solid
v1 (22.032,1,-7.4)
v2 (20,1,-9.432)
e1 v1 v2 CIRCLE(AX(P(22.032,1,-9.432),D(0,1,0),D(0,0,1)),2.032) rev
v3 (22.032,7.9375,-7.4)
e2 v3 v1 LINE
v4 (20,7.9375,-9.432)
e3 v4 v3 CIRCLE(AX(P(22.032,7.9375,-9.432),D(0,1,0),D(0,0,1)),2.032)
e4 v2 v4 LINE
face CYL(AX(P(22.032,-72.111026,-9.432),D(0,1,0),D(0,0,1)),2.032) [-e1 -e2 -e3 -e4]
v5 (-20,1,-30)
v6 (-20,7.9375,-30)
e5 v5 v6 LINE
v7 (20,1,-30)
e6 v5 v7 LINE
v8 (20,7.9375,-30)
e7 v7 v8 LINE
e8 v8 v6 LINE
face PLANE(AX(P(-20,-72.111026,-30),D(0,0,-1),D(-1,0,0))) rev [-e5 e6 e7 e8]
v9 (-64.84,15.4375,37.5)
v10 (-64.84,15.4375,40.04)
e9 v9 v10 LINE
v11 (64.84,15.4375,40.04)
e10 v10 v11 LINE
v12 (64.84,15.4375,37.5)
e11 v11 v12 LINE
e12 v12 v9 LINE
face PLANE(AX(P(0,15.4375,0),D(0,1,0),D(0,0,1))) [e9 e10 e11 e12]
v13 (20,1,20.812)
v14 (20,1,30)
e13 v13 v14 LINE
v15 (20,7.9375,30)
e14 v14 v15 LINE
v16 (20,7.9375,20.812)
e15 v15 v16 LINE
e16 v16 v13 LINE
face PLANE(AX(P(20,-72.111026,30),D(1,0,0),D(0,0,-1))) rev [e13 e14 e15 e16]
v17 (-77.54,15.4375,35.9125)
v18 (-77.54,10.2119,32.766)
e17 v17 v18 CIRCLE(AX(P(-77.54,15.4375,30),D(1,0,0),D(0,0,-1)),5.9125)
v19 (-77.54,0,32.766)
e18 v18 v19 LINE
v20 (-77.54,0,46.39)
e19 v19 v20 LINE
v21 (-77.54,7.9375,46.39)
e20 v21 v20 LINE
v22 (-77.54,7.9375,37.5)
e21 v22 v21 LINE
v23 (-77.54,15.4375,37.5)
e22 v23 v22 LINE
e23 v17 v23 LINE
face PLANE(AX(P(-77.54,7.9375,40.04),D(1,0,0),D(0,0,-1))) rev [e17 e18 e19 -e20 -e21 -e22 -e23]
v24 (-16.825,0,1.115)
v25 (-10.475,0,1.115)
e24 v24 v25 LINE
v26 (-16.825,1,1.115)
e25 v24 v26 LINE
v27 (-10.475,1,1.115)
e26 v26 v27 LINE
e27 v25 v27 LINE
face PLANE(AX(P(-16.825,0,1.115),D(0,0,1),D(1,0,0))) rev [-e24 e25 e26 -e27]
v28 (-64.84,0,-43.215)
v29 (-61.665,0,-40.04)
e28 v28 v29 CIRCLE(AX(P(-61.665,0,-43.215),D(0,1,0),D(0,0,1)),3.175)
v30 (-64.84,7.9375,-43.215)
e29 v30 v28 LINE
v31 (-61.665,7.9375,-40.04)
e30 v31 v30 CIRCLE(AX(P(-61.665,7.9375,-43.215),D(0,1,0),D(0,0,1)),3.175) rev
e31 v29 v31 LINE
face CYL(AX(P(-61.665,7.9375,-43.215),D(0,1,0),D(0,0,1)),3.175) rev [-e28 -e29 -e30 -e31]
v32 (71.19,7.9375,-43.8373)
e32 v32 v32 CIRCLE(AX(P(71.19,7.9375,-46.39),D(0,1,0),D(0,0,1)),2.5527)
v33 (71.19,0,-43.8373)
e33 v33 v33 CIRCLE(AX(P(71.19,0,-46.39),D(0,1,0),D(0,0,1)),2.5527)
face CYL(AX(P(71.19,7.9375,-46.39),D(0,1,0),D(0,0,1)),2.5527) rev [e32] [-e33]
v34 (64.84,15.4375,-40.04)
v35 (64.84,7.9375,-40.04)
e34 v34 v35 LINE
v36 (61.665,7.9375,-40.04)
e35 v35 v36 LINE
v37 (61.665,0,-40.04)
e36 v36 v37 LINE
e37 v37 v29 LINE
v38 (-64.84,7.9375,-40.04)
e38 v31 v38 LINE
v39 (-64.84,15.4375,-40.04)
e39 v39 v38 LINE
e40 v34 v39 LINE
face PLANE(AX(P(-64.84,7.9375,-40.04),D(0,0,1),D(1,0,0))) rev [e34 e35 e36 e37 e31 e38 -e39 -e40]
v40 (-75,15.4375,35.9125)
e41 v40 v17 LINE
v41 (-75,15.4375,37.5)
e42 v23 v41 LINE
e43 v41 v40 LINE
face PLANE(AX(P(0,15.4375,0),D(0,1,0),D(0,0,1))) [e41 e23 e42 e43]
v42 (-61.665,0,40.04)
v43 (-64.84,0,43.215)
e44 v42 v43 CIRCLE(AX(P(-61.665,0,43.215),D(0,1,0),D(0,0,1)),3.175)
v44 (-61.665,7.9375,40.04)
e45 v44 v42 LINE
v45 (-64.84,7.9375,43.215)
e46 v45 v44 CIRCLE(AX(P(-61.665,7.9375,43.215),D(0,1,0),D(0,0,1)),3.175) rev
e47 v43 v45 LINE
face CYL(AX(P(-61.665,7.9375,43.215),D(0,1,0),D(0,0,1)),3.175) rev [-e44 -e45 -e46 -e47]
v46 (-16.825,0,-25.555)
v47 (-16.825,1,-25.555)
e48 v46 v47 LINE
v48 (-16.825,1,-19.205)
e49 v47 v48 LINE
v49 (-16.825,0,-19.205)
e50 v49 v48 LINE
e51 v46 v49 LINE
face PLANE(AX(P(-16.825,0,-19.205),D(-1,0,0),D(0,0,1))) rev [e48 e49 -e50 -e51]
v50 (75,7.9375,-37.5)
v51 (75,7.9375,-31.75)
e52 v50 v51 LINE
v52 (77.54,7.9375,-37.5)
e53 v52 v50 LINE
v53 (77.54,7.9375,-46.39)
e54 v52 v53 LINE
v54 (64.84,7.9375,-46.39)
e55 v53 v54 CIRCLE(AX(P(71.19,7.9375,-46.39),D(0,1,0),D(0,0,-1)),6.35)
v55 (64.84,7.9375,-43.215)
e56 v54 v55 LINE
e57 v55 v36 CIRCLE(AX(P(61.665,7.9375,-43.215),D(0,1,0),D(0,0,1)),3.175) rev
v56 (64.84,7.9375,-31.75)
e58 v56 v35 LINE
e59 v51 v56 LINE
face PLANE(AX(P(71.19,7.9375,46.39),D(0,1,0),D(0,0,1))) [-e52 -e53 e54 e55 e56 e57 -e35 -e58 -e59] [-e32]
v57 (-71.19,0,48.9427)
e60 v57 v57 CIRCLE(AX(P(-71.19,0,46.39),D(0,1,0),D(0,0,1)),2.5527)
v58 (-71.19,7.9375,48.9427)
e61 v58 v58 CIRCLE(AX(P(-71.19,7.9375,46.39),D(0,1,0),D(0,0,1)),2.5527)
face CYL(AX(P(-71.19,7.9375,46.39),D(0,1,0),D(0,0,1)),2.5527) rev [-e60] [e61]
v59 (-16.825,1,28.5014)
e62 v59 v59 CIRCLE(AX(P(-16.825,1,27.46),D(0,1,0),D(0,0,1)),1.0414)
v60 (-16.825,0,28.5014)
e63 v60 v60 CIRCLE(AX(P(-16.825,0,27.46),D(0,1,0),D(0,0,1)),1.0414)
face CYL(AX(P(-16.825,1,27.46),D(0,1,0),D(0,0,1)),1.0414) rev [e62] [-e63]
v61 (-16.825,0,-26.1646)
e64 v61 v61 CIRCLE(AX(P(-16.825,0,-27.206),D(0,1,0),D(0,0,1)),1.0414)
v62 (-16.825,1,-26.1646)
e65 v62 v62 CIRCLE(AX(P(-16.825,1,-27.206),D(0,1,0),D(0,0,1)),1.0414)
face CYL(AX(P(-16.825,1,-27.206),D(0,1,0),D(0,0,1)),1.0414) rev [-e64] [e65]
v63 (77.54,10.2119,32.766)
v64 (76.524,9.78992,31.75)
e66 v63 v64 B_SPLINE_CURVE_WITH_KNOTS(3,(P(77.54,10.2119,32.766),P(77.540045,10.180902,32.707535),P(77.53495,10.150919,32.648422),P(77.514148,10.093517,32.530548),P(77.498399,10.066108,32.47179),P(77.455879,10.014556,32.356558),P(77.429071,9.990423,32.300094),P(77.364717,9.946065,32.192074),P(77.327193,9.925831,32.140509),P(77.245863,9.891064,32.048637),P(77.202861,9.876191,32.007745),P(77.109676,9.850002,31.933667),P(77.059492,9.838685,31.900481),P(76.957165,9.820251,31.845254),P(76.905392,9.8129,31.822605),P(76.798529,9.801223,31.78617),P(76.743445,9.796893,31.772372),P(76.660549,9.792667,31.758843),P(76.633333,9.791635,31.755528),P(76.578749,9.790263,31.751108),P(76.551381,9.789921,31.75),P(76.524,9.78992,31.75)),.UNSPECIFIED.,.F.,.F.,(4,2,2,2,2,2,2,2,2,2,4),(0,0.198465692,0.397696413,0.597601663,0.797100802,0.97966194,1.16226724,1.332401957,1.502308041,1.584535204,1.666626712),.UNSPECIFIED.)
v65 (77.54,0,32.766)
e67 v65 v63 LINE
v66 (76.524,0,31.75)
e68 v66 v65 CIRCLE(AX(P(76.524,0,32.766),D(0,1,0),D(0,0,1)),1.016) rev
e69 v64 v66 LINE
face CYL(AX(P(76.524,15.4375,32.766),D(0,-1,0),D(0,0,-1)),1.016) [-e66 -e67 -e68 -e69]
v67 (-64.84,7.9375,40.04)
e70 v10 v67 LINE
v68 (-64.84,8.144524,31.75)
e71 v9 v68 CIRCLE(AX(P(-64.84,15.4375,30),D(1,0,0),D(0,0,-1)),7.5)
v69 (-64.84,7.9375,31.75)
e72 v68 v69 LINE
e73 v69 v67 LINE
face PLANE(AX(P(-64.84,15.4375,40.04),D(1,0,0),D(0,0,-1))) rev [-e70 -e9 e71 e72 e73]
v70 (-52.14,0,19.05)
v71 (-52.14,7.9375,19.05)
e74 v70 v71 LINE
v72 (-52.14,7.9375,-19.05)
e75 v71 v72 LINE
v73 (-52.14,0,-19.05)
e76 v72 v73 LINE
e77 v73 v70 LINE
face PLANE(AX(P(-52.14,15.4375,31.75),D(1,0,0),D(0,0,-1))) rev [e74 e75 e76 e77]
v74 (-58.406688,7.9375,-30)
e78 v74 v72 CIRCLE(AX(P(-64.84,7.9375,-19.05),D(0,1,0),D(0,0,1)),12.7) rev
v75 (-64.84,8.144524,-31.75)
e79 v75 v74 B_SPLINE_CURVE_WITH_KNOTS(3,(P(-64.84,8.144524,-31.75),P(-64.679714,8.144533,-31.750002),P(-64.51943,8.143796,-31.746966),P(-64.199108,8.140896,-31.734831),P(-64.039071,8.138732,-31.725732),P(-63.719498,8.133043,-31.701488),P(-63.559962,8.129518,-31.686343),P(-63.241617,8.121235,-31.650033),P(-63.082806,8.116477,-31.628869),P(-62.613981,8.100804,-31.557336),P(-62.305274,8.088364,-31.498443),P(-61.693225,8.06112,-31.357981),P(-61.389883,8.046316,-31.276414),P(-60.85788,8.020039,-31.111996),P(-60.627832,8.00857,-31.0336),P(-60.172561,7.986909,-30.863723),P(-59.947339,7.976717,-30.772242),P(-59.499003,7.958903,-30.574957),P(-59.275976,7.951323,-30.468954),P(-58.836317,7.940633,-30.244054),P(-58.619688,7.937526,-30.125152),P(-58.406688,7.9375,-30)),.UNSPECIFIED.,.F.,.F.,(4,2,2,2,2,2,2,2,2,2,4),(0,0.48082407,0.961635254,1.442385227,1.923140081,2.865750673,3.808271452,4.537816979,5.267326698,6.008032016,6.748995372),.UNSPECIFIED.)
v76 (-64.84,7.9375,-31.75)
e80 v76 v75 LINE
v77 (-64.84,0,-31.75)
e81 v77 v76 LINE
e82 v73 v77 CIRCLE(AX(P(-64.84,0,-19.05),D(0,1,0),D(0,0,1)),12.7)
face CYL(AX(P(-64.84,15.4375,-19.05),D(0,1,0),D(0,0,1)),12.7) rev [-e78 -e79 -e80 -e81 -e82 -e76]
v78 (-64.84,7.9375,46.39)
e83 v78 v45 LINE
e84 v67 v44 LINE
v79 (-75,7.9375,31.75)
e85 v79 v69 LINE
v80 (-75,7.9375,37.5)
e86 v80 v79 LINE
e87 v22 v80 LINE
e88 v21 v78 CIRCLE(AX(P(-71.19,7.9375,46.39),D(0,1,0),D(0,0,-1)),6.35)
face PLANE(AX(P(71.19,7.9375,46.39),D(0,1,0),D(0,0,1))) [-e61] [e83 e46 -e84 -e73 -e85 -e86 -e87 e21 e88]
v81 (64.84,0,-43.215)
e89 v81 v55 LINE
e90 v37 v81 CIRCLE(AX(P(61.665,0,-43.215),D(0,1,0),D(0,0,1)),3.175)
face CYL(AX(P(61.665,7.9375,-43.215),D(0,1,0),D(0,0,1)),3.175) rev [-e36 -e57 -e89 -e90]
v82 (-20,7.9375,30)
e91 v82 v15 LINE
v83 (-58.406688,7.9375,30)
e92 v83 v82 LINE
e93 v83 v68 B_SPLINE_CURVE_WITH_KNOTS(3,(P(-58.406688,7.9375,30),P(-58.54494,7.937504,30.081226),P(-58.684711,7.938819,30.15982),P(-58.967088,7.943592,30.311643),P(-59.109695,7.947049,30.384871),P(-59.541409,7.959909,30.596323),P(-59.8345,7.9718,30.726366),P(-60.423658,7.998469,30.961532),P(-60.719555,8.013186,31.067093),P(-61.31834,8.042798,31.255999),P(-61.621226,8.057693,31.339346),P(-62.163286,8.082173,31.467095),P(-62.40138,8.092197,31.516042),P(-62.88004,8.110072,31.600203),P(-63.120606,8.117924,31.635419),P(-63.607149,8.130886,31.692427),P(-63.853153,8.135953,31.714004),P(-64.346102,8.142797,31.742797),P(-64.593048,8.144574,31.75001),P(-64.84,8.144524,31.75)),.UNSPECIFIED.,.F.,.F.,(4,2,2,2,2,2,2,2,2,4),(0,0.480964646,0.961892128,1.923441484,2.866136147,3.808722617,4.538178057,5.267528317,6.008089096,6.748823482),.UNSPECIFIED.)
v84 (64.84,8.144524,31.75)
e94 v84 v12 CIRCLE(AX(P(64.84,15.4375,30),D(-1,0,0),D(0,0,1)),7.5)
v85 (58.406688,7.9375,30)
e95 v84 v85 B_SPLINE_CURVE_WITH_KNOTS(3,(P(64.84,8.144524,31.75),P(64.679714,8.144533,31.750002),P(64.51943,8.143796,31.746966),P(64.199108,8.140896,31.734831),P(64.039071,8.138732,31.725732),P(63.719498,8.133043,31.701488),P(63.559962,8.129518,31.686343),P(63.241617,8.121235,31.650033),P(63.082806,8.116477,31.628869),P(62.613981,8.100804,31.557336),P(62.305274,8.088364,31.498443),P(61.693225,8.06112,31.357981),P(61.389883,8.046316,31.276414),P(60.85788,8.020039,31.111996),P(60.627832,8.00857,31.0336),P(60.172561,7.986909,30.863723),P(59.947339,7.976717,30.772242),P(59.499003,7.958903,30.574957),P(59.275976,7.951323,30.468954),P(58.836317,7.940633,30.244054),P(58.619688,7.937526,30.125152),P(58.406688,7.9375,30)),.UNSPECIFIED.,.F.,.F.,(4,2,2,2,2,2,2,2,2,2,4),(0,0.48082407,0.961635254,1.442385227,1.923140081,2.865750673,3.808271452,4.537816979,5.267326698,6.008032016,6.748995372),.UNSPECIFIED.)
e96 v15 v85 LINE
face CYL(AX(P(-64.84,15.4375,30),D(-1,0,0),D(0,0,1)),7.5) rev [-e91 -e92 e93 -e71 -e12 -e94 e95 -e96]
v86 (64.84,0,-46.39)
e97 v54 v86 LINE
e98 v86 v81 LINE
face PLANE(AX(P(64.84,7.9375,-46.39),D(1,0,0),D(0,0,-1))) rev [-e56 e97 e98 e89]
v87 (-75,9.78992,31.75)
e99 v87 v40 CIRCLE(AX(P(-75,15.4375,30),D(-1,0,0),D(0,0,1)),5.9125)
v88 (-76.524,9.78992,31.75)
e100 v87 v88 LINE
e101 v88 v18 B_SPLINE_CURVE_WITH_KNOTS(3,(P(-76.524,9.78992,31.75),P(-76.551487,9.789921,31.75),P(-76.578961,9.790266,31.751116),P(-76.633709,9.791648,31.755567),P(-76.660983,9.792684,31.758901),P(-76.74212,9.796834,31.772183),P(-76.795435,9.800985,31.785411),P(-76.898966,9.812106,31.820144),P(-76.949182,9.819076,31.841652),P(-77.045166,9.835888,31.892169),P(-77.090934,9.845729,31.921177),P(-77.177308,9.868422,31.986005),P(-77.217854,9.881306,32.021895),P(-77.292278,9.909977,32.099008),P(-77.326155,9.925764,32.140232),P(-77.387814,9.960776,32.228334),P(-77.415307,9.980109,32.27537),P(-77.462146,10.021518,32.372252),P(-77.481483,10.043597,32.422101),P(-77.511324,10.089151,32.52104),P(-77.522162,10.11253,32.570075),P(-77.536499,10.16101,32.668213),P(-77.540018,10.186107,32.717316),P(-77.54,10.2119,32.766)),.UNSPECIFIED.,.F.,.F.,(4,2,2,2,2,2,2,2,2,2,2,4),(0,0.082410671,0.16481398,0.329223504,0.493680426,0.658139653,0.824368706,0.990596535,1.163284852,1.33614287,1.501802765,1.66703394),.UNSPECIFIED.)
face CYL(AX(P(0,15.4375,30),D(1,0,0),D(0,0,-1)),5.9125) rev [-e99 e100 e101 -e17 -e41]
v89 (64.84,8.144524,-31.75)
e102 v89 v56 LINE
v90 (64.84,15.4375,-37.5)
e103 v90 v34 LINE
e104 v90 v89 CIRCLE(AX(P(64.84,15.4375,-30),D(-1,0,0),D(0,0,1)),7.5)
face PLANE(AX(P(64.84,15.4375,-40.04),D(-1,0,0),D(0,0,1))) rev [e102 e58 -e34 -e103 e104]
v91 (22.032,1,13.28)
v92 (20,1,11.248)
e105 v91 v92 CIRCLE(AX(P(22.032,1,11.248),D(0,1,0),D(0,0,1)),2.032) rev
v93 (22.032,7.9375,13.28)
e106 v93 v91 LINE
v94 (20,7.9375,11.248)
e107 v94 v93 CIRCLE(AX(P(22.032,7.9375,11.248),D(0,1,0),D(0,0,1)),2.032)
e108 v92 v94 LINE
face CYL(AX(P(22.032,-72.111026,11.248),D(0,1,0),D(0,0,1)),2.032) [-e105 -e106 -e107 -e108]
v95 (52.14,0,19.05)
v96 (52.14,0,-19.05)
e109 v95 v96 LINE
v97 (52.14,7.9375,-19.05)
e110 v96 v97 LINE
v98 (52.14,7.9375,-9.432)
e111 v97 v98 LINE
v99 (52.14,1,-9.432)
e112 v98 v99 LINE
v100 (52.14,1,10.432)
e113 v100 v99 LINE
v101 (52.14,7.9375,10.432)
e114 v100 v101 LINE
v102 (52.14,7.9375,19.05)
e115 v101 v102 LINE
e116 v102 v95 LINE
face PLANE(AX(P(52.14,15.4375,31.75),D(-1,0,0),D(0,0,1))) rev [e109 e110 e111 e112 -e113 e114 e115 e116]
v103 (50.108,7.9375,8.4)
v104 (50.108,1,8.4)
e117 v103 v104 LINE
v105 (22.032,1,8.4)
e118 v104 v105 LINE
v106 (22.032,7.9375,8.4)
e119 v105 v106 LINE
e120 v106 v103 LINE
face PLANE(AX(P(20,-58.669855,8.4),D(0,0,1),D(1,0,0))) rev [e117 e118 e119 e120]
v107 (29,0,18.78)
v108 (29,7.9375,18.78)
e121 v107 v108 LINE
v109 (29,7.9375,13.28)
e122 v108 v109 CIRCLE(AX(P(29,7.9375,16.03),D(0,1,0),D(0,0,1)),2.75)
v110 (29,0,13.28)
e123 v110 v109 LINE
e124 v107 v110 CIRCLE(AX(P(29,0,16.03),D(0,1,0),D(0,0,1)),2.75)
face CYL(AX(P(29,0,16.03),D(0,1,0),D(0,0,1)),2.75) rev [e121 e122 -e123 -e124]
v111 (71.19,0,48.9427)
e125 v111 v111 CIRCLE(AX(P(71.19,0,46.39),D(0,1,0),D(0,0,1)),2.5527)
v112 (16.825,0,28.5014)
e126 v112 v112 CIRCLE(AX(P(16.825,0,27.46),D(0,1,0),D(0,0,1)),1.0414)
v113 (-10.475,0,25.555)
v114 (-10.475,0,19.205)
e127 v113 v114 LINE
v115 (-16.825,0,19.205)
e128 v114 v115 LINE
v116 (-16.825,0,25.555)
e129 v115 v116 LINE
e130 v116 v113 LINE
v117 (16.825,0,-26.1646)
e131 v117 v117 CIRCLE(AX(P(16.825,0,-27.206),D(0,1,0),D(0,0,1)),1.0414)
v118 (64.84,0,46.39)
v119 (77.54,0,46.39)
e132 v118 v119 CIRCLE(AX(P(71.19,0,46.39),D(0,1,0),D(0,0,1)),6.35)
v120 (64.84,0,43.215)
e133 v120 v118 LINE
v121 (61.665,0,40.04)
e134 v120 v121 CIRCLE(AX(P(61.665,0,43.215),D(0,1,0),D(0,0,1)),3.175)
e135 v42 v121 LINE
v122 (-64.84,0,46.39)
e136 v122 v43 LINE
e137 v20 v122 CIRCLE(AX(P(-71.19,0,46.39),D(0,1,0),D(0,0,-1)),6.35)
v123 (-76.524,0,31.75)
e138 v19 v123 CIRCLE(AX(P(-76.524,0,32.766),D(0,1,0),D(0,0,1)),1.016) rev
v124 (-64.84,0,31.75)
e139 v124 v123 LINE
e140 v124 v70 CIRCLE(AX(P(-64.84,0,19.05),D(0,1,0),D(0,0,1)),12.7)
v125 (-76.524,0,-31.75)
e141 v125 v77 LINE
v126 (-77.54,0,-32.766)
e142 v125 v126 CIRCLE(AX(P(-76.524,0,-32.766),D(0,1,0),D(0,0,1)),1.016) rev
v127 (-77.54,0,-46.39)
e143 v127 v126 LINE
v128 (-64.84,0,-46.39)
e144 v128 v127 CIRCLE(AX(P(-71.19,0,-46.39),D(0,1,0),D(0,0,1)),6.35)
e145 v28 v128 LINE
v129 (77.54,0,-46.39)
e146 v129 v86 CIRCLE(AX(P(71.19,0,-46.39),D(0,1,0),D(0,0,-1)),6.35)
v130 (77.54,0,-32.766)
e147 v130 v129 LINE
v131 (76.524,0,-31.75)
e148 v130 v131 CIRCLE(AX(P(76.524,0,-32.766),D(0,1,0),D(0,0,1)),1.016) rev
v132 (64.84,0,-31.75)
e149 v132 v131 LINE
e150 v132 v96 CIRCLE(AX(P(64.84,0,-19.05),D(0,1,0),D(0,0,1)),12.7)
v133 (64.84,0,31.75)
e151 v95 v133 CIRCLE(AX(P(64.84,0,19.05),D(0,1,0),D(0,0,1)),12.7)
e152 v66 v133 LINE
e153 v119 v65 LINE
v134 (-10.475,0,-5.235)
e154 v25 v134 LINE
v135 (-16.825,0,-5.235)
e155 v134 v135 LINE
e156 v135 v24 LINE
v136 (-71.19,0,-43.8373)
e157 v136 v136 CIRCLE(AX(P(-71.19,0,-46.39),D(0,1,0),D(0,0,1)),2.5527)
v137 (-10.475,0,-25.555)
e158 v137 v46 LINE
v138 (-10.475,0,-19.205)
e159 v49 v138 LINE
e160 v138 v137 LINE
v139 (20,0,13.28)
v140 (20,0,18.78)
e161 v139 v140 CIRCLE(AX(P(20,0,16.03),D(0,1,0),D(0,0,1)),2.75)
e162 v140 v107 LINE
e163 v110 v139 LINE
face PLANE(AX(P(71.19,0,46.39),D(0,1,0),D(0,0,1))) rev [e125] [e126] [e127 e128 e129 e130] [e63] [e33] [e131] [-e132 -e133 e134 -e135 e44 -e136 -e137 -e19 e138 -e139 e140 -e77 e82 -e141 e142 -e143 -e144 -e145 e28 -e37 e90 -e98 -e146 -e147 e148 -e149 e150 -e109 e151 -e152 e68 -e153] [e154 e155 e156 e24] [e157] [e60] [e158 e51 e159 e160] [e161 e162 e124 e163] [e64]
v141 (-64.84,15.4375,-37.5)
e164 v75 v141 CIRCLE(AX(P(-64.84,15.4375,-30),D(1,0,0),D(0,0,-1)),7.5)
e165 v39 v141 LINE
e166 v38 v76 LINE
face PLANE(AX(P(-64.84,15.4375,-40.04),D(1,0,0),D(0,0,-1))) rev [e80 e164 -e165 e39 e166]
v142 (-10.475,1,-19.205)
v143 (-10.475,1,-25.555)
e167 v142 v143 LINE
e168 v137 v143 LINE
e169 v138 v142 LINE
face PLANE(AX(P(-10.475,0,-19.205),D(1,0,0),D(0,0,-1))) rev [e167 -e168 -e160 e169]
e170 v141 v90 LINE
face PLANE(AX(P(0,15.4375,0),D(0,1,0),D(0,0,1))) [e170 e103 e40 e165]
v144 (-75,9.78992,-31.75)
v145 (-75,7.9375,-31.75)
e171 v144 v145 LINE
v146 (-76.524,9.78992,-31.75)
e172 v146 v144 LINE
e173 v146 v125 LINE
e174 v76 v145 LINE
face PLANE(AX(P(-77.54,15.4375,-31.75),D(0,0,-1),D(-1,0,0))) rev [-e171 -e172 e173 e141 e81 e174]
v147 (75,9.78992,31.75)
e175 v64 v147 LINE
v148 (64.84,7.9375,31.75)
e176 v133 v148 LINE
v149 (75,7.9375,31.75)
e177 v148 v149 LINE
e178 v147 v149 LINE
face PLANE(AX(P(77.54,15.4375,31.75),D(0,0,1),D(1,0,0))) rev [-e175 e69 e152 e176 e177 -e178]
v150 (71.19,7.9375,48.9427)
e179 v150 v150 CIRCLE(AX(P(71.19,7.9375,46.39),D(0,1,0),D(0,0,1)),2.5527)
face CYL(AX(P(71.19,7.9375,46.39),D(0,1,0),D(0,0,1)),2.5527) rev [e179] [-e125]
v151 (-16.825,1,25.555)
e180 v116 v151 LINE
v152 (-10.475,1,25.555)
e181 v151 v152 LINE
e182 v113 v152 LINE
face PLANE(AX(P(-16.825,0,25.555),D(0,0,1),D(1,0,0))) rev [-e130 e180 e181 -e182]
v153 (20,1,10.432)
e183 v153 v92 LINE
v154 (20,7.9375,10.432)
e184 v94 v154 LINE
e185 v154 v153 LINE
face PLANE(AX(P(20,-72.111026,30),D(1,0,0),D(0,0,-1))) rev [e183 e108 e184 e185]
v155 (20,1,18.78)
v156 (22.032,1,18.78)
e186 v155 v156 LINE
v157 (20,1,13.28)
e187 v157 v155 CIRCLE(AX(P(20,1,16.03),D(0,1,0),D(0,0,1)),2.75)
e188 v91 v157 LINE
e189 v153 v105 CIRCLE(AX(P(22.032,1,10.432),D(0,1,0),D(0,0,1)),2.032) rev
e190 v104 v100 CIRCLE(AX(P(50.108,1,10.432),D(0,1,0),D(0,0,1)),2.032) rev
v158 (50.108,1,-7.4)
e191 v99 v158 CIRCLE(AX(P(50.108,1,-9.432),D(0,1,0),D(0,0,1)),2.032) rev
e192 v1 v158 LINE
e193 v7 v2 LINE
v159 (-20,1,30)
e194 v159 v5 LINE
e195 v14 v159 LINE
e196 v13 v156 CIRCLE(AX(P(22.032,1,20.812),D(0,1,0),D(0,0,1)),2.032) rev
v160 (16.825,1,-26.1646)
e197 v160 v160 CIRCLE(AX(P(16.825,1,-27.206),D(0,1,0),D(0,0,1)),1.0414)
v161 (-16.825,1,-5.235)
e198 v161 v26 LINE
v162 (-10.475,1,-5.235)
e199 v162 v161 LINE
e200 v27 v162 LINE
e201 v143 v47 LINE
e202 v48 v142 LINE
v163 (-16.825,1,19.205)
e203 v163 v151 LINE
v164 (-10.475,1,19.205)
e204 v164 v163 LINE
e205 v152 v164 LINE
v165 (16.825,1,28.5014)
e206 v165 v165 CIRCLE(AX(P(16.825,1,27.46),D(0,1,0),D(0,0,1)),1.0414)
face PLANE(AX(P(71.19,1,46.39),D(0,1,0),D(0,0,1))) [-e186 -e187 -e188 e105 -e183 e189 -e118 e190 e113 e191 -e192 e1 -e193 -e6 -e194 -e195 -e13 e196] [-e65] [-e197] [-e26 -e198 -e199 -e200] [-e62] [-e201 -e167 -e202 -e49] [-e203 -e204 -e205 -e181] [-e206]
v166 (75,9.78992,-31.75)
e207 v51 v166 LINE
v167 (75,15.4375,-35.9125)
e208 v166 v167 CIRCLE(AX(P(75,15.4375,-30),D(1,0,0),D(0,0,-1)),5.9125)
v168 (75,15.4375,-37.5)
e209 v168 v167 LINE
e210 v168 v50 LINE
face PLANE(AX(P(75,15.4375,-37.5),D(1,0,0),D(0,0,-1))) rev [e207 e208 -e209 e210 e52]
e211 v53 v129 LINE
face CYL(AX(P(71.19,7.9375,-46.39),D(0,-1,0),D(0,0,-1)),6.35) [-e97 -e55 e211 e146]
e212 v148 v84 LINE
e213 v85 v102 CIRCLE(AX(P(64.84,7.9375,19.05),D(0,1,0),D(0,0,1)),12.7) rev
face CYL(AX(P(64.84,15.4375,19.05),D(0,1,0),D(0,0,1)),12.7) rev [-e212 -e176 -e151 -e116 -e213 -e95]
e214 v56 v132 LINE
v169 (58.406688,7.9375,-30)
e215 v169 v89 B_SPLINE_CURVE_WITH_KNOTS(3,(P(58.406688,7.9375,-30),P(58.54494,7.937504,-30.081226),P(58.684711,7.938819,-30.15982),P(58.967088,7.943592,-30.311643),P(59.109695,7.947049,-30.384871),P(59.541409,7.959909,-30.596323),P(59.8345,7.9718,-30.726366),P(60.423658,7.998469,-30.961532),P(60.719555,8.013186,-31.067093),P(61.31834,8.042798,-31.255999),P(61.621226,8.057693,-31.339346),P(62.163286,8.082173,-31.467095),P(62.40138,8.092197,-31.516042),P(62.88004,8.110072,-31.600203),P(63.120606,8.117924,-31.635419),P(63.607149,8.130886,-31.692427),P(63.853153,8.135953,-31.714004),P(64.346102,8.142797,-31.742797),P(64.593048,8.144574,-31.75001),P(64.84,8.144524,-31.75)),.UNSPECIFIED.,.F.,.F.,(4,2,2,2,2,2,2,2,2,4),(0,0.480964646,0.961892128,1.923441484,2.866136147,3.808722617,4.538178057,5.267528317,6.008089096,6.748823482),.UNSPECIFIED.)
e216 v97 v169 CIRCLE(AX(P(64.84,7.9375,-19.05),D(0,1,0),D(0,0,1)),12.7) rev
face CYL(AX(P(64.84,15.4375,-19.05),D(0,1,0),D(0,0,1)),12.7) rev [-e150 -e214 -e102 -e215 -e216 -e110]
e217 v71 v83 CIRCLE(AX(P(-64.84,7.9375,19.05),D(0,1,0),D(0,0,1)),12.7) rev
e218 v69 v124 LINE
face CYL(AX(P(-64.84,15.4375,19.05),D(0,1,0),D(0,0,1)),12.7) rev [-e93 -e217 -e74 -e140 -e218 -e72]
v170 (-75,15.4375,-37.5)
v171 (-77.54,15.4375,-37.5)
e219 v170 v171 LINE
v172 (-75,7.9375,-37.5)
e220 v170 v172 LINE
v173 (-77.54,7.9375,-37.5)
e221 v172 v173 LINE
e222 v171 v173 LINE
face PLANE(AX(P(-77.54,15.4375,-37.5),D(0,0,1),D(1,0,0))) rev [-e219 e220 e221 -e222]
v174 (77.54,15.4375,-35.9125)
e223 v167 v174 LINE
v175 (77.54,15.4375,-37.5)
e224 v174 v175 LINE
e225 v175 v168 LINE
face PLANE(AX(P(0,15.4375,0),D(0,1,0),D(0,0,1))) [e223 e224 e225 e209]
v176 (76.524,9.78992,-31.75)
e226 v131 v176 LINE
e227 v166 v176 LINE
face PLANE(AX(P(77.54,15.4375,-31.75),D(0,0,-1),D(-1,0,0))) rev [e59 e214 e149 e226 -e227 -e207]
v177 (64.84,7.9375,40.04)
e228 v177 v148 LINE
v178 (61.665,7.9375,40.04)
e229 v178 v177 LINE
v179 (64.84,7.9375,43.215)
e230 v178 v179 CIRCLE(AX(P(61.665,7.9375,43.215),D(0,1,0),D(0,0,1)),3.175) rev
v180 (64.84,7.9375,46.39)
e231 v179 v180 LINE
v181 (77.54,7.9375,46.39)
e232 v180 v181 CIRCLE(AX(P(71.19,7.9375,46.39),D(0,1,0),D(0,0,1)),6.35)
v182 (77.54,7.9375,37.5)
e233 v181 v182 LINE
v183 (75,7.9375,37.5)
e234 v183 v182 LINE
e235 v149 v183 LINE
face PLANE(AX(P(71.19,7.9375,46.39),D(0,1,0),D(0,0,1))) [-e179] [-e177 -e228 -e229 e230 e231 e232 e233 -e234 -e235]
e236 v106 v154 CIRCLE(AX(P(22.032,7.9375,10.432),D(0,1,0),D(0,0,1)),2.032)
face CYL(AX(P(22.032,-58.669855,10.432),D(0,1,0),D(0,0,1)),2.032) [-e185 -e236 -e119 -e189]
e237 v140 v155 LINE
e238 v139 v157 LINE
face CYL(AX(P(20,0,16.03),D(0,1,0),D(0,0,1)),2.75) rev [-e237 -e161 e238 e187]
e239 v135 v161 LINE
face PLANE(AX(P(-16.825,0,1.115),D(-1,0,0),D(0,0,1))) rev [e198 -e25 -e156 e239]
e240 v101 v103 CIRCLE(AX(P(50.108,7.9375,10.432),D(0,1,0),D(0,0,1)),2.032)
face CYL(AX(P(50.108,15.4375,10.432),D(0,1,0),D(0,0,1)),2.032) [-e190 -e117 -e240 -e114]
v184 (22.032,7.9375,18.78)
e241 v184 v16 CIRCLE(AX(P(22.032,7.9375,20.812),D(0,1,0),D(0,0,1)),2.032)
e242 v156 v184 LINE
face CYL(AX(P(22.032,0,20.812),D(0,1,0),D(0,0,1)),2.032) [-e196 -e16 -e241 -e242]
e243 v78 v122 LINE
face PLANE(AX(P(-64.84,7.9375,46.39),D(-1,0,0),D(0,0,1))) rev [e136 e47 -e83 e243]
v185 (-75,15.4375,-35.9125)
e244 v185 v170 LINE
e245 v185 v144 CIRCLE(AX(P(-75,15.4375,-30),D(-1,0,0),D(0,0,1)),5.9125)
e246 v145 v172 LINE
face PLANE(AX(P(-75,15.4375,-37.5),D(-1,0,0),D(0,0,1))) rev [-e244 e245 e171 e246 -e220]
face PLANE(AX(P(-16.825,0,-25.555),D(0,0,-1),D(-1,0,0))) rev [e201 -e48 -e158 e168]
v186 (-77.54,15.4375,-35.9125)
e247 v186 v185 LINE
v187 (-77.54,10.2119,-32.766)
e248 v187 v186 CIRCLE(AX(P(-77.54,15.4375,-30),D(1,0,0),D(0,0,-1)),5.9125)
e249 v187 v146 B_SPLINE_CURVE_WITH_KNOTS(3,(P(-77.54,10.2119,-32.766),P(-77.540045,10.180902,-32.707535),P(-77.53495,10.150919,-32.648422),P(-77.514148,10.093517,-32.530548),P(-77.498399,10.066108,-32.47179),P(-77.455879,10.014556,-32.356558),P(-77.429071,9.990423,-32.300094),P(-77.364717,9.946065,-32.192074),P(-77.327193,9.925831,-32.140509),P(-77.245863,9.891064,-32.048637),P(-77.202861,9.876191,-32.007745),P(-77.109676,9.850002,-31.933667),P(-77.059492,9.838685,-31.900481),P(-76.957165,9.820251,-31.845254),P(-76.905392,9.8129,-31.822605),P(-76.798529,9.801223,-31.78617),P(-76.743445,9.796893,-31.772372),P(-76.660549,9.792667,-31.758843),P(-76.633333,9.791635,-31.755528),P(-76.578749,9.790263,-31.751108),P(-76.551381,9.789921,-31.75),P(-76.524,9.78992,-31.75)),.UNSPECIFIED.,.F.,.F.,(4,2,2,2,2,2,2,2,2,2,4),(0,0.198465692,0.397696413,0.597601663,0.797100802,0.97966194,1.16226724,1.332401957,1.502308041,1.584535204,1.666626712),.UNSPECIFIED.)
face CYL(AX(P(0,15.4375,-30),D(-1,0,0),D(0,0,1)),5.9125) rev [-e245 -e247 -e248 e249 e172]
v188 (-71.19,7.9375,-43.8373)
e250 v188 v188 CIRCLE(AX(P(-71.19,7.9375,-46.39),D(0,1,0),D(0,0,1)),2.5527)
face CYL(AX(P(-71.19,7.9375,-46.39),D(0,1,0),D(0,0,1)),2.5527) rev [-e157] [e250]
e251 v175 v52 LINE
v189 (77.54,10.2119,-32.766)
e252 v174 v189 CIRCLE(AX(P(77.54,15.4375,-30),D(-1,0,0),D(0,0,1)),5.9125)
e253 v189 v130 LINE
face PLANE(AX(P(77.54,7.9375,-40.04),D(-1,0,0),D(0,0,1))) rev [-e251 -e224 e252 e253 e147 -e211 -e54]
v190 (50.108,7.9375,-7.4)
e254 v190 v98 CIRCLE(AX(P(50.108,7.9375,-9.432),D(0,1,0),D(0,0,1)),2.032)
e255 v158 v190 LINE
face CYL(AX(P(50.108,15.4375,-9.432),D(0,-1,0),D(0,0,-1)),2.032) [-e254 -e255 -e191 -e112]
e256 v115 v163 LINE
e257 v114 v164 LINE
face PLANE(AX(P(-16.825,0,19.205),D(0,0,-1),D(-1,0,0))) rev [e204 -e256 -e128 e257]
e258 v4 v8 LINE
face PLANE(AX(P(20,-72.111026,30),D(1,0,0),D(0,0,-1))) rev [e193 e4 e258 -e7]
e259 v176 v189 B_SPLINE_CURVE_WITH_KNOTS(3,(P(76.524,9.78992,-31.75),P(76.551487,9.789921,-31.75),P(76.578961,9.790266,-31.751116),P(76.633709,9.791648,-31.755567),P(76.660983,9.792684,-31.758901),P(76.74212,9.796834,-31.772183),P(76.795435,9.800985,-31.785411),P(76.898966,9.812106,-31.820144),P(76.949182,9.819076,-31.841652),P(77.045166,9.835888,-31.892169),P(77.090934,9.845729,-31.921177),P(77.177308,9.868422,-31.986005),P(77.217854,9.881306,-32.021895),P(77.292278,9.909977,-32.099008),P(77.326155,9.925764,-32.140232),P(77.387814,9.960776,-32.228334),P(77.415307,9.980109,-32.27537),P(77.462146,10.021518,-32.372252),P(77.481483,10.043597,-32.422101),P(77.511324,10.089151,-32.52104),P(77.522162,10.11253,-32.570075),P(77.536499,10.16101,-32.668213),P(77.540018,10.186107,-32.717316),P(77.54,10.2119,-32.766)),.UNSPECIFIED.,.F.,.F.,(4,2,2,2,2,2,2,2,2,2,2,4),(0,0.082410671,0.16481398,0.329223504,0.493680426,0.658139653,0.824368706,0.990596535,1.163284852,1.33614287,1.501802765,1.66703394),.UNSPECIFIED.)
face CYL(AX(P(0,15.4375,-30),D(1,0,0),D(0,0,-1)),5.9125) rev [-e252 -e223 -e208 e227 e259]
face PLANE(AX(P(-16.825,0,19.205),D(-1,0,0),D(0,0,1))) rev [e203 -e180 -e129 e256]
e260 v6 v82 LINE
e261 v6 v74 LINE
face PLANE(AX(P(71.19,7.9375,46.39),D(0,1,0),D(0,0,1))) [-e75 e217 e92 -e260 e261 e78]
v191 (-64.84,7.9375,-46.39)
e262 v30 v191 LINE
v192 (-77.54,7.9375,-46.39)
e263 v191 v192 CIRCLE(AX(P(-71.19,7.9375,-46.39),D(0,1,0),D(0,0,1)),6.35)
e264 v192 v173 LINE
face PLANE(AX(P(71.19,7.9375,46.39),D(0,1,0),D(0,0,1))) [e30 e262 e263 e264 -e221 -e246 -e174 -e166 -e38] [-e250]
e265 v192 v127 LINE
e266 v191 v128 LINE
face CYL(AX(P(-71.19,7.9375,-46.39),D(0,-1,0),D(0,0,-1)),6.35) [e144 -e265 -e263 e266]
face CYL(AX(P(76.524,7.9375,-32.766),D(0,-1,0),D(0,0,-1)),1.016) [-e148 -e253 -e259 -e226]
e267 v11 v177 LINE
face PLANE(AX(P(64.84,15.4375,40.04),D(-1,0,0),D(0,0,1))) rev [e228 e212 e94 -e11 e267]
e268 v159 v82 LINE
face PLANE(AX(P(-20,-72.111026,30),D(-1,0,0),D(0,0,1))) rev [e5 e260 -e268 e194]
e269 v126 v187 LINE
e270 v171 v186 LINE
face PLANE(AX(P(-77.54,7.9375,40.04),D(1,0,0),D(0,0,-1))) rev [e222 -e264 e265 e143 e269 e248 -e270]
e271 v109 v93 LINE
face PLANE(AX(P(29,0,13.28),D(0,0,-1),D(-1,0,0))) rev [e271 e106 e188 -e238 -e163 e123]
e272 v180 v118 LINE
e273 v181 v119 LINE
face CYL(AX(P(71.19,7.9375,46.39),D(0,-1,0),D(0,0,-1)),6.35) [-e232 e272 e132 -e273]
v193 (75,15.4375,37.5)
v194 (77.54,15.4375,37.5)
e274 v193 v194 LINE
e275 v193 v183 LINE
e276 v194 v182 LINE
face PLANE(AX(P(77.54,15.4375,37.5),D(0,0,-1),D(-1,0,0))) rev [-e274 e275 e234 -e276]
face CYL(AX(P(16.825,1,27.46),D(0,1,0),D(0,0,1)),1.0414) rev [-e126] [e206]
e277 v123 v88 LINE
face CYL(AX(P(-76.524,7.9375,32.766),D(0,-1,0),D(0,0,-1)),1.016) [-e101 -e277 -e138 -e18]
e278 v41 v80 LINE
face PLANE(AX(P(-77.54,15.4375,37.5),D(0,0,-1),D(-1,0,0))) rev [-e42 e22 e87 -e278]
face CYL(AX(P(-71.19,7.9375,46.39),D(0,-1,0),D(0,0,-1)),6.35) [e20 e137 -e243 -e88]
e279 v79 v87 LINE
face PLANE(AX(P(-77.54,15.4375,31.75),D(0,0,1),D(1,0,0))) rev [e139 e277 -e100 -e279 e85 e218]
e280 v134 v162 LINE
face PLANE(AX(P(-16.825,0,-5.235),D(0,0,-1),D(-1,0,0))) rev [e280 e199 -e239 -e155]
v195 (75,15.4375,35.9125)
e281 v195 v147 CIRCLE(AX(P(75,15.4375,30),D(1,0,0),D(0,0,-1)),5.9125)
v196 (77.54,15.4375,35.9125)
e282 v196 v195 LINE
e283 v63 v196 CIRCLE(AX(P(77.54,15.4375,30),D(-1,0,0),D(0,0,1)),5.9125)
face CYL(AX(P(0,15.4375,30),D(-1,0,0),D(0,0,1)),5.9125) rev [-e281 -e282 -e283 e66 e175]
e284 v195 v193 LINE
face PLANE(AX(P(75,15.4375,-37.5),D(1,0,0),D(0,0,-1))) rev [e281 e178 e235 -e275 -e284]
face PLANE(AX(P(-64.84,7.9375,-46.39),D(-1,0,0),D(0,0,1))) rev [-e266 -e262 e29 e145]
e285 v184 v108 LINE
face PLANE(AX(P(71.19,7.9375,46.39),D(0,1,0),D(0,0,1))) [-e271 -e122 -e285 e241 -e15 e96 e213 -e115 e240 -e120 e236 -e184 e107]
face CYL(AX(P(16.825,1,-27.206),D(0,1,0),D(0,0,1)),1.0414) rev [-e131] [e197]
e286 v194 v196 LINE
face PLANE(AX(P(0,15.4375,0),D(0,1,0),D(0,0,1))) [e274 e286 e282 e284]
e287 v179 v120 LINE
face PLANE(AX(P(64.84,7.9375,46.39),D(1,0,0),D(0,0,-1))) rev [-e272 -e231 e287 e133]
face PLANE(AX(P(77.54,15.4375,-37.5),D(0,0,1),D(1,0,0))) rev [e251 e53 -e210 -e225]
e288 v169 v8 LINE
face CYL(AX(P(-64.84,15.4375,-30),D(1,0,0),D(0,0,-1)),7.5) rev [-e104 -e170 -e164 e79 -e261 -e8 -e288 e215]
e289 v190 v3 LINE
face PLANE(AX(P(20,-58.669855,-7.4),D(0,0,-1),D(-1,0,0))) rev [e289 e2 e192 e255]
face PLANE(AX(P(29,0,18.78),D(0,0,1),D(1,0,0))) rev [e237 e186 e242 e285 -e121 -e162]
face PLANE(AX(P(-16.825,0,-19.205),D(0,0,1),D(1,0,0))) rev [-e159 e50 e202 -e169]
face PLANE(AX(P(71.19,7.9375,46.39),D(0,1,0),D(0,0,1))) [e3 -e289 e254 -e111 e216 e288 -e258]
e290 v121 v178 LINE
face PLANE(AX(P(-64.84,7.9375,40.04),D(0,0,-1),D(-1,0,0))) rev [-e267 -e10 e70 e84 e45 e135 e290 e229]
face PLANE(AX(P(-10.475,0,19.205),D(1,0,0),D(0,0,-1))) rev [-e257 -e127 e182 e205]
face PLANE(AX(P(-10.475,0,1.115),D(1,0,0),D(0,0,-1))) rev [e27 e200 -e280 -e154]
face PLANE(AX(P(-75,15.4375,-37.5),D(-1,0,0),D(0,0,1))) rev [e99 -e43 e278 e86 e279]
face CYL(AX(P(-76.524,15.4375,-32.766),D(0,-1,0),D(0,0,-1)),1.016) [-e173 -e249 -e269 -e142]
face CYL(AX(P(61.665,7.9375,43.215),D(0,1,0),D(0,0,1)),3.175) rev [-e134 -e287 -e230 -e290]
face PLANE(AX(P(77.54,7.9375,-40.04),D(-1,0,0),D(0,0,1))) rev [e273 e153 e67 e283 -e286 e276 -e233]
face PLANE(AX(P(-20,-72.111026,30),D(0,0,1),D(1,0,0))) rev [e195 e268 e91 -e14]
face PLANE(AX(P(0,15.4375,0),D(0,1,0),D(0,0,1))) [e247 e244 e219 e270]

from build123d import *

# Parameters (mm, degrees)
BOSS_EXTRUDE1_DEPTH         = 7.9375
F_10_CLEARANCE_HOLE1_D      = 5.1054
SKETCH8_W                   = 2.54
SKETCH8_H                   = 1.5875
SKETCH8_W_2                 = 129.68
SKETCH8_H_2                 = 2.54
BOSS_EXTRUDE2_DEPTH         = 7.5
SKETCH10_W                  = 2.54
SKETCH10_H                  = 71.825
BOSS_EXTRUDE3_DEPTH         = 1.5875
FILLET3_R                   = 3.175
FILLET4_R                   = 5.9125
FILLET5_R                   = 7.5
SKETCH11_W                  = 25.4
SKETCH11_H                  = 63.5
CUT_EXTRUDE1_DEPTH          = 96.03828495
FILLET6_R                   = 12.7
SKETCH12_W                  = 40
SKETCH12_H                  = 60
CUT_EXTRUDE2_DEPTH          = 6.9375
SKETCH13_W                  = 57.54
SKETCH13_H                  = 15.8
CUT_EXTRUDE3_DEPTH          = 6.9375
CUT_EXTRUDE4_DEPTH          = 95.111439835
SKETCH15_W                  = 6.35
SKETCH15_H                  = 6.35
CUT_EXTRUDE5_DEPTH          = 95.880981267
FILLET7_R                   = 2.032
F_45_0_082_DIAMETER_HOLE1_D = 2.0828
FILLET8_R                   = 1.016


with BuildPart() as part:
    # Sketch1 → Boss-Extrude1 (new body)
    with BuildSketch(Plane(origin=(0, 0, 0), x_dir=(1, 0, 0), z_dir=(0, 1, 0))):
        with BuildLine():
            Line((77.54, -40.04), (77.54, 40.04))
            Line((77.54, 40.04), (77.54, 46.39))
            ThreePointArc((77.54, 46.39), (71.19, 52.74), (64.84, 46.39))
            Line((64.84, 46.39), (64.84, 40.04))
            Line((64.84, 40.04), (-64.84, 40.04))
            Line((-64.84, 40.04), (-64.84, 46.39))
            ThreePointArc((-64.84, 46.39), (-71.19, 52.74), (-77.54, 46.39))
            Line((-77.54, 46.39), (-77.54, 40.04))
            Line((-77.54, 40.04), (-77.54, -40.04))
            Line((-77.54, -40.04), (-77.54, -46.39))
            ThreePointArc((-77.54, -46.39), (-71.19, -52.74), (-64.84, -46.39))
            Line((-64.84, -46.39), (-64.84, -40.04))
            Line((-64.84, -40.04), (64.84, -40.04))
            Line((64.84, -40.04), (64.84, -46.39))
            ThreePointArc((64.84, -46.39), (71.19, -52.74), (77.54, -46.39))
            Line((77.54, -46.39), (77.54, -40.04))
        make_face()
    extrude(amount=BOSS_EXTRUDE1_DEPTH)

    # #10 Clearance Hole1 (through all)
    with Locations(Plane(origin=(0, 7.9375, 0), x_dir=(1, 0, 0), z_dir=(0, 1, 0))):
        with Locations((-71.19, 46.39), (71.19, 46.39), (71.19, -46.39), (-71.19, -46.39)):
            Hole(F_10_CLEARANCE_HOLE1_D / 2)

    # Sketch8 → Boss-Extrude2 (add)
    with BuildSketch(Plane(origin=(0, 7.9375, 0), x_dir=(1, 0, 0), z_dir=(0, 1, 0))):
        with Locations((-76.27, 36.70625)):
            Rectangle(SKETCH8_W, SKETCH8_H)
        with Locations((76.27, 36.70625)):
            Rectangle(SKETCH8_W, SKETCH8_H)
        with Locations((76.27, -36.70625)):
            Rectangle(SKETCH8_W, SKETCH8_H)
        with Locations((-76.27, -36.70625)):
            Rectangle(SKETCH8_W, SKETCH8_H)
        with Locations((0, 38.77)):
            Rectangle(SKETCH8_W_2, SKETCH8_H_2)
        with Locations((0, -38.77)):
            Rectangle(SKETCH8_W_2, SKETCH8_H_2)
    extrude(amount=BOSS_EXTRUDE2_DEPTH)

    # Sketch10 → Boss-Extrude3 (add)
    with BuildSketch(Plane(origin=(0, 7.9375, 0), x_dir=(1, 0, 0), z_dir=(0, 1, 0))):
        with Locations((-76.27, 0)):
            Rectangle(SKETCH10_W, SKETCH10_H)
        with Locations((76.27, 0)):
            Rectangle(SKETCH10_W, SKETCH10_H)
    extrude(amount=BOSS_EXTRUDE3_DEPTH)

    # Fillet3
    fillet3_edges = [part.edges().sort_by_distance(p)[0] for p in [
        (64.84, 3.96875, 40.04),
        (-64.84, 3.96875, 40.04),
        (-64.84, 3.96875, -40.04),
        (64.84, 3.96875, -40.04),
    ]]
    fillet(fillet3_edges, radius=FILLET3_R)

    # Fillet4
    fillet4_edges = [part.edges().sort_by_distance(p)[0] for p in [
        (76.27, 9.525, 35.9125),
        (76.27, 9.525, -35.9125),
        (-76.27, 9.525, 35.9125),
        (-76.27, 9.525, -35.9125),
    ]]
    fillet(fillet4_edges, radius=FILLET4_R - 0.0001)  # a hair under: the kernel refuses the full size

    # Fillet5
    fillet5_edges = [part.edges().sort_by_distance(p)[0] for p in [
        (0, 7.9375, 37.5),
        (0, 7.9375, -37.5),
    ]]
    fillet(fillet5_edges, radius=FILLET5_R - 0.0001)  # a hair under: the kernel refuses the full size

    # Sketch11 → Cut-Extrude1 (cut, through all)
    with BuildSketch(Plane.XZ):
        with Locations((-64.84, 0)):
            Rectangle(SKETCH11_W, SKETCH11_H)
        with Locations((64.84, 0)):
            Rectangle(SKETCH11_W, SKETCH11_H)
    extrude(amount=-CUT_EXTRUDE1_DEPTH, mode=Mode.SUBTRACT)

    # Fillet6
    fillet6_edges = [part.edges().sort_by_distance(p)[0] for p in [
        (-52.14, 4.072251385, 31.75),
    ]]
    fillet(fillet6_edges, radius=FILLET6_R)
    fillet6_2_edges = [part.edges().sort_by_distance(p)[0] for p in [
        (-52.14, 4.072251385, -31.75),
    ]]
    fillet(fillet6_2_edges, radius=FILLET6_R)
    fillet6_3_edges = [part.edges().sort_by_distance(p)[0] for p in [
        (52.14, 4.072251385, -31.75),
    ]]
    fillet(fillet6_3_edges, radius=FILLET6_R)
    fillet6_4_edges = [part.edges().sort_by_distance(p)[0] for p in [
        (52.14, 4.072251385, 31.75),
    ]]
    fillet(fillet6_4_edges, radius=FILLET6_R)

    # Sketch12 → Cut-Extrude2 (cut)
    with BuildSketch(Plane(origin=(0, 7.9375, 0), x_dir=(1, 0, 0), z_dir=(0, 1, 0))):
        Rectangle(SKETCH12_W, SKETCH12_H)
    extrude(amount=-CUT_EXTRUDE2_DEPTH, mode=Mode.SUBTRACT)

    # Sketch13 → Cut-Extrude3 (cut)
    with BuildSketch(Plane(origin=(0, 7.9375, 0), x_dir=(1, 0, 0), z_dir=(0, 1, 0))):
        with Locations((48.77, -0.5)):
            Rectangle(SKETCH13_W, SKETCH13_H)
    extrude(amount=-CUT_EXTRUDE3_DEPTH, mode=Mode.SUBTRACT)

    # Sketch14 → Cut-Extrude4 (cut, through all)
    with BuildSketch(Plane(origin=(0, 7.9375, 0), x_dir=(1, 0, 0), z_dir=(0, 1, 0))):
        with BuildLine():
            Line((29, -18.78), (20, -18.78))
            ThreePointArc((20, -18.78), (17.25, -16.03), (20, -13.28))
            Line((20, -13.28), (29, -13.28))
            ThreePointArc((29, -13.28), (31.75, -16.03), (29, -18.78))
        make_face()
    extrude(amount=-CUT_EXTRUDE4_DEPTH, mode=Mode.SUBTRACT)

    # Sketch15 → Cut-Extrude5 (cut, through all)
    with BuildSketch(Plane(origin=(0, 1, 0), x_dir=(1, 0, 0), z_dir=(0, 1, 0))):
        with Locations((-13.65, 2.06)):
            Rectangle(SKETCH15_W, SKETCH15_H)
        with Locations((-13.65, 22.38)):
            Rectangle(SKETCH15_W, SKETCH15_H)
        with Locations((-13.65, -22.38)):
            Rectangle(SKETCH15_W, SKETCH15_H)
    extrude(amount=-CUT_EXTRUDE5_DEPTH, mode=Mode.SUBTRACT)

    # Fillet7
    fillet7_edges = [part.edges().sort_by_distance(p)[0] for p in [
        (52.14, 4.46875, -7.4),
        (20, 4.46875, -7.4),
        (52.14, 4.46875, 8.4),
        (20, 4.46875, 8.4),
        (20, 4.46875, 18.78),
        (20, 4.46875, 13.28),
    ]]
    fillet(fillet7_edges, radius=FILLET7_R)

    # #45 (0.082) Diameter Hole1 (through all)
    with Locations(Plane(origin=(0, 1, 0), x_dir=(1, 0, 0), z_dir=(0, 1, 0))):
        with Locations((-16.825, 27.206), (16.825, -27.46), (-16.825, -27.46), (16.825, 27.206)):
            Hole(F_45_0_082_DIAMETER_HOLE1_D / 2)

    # Fillet8
    fillet8_edges = [part.edges().sort_by_distance(p)[0] for p in [
        (-77.54, 4.894947012, -31.75),
        (-77.54, 4.894947012, 31.75),
        (77.54, 4.894947012, 31.75),
        (77.54, 4.894947012, -31.75),
    ]]
    fillet(fillet8_edges, radius=FILLET8_R)


solid = part.part
